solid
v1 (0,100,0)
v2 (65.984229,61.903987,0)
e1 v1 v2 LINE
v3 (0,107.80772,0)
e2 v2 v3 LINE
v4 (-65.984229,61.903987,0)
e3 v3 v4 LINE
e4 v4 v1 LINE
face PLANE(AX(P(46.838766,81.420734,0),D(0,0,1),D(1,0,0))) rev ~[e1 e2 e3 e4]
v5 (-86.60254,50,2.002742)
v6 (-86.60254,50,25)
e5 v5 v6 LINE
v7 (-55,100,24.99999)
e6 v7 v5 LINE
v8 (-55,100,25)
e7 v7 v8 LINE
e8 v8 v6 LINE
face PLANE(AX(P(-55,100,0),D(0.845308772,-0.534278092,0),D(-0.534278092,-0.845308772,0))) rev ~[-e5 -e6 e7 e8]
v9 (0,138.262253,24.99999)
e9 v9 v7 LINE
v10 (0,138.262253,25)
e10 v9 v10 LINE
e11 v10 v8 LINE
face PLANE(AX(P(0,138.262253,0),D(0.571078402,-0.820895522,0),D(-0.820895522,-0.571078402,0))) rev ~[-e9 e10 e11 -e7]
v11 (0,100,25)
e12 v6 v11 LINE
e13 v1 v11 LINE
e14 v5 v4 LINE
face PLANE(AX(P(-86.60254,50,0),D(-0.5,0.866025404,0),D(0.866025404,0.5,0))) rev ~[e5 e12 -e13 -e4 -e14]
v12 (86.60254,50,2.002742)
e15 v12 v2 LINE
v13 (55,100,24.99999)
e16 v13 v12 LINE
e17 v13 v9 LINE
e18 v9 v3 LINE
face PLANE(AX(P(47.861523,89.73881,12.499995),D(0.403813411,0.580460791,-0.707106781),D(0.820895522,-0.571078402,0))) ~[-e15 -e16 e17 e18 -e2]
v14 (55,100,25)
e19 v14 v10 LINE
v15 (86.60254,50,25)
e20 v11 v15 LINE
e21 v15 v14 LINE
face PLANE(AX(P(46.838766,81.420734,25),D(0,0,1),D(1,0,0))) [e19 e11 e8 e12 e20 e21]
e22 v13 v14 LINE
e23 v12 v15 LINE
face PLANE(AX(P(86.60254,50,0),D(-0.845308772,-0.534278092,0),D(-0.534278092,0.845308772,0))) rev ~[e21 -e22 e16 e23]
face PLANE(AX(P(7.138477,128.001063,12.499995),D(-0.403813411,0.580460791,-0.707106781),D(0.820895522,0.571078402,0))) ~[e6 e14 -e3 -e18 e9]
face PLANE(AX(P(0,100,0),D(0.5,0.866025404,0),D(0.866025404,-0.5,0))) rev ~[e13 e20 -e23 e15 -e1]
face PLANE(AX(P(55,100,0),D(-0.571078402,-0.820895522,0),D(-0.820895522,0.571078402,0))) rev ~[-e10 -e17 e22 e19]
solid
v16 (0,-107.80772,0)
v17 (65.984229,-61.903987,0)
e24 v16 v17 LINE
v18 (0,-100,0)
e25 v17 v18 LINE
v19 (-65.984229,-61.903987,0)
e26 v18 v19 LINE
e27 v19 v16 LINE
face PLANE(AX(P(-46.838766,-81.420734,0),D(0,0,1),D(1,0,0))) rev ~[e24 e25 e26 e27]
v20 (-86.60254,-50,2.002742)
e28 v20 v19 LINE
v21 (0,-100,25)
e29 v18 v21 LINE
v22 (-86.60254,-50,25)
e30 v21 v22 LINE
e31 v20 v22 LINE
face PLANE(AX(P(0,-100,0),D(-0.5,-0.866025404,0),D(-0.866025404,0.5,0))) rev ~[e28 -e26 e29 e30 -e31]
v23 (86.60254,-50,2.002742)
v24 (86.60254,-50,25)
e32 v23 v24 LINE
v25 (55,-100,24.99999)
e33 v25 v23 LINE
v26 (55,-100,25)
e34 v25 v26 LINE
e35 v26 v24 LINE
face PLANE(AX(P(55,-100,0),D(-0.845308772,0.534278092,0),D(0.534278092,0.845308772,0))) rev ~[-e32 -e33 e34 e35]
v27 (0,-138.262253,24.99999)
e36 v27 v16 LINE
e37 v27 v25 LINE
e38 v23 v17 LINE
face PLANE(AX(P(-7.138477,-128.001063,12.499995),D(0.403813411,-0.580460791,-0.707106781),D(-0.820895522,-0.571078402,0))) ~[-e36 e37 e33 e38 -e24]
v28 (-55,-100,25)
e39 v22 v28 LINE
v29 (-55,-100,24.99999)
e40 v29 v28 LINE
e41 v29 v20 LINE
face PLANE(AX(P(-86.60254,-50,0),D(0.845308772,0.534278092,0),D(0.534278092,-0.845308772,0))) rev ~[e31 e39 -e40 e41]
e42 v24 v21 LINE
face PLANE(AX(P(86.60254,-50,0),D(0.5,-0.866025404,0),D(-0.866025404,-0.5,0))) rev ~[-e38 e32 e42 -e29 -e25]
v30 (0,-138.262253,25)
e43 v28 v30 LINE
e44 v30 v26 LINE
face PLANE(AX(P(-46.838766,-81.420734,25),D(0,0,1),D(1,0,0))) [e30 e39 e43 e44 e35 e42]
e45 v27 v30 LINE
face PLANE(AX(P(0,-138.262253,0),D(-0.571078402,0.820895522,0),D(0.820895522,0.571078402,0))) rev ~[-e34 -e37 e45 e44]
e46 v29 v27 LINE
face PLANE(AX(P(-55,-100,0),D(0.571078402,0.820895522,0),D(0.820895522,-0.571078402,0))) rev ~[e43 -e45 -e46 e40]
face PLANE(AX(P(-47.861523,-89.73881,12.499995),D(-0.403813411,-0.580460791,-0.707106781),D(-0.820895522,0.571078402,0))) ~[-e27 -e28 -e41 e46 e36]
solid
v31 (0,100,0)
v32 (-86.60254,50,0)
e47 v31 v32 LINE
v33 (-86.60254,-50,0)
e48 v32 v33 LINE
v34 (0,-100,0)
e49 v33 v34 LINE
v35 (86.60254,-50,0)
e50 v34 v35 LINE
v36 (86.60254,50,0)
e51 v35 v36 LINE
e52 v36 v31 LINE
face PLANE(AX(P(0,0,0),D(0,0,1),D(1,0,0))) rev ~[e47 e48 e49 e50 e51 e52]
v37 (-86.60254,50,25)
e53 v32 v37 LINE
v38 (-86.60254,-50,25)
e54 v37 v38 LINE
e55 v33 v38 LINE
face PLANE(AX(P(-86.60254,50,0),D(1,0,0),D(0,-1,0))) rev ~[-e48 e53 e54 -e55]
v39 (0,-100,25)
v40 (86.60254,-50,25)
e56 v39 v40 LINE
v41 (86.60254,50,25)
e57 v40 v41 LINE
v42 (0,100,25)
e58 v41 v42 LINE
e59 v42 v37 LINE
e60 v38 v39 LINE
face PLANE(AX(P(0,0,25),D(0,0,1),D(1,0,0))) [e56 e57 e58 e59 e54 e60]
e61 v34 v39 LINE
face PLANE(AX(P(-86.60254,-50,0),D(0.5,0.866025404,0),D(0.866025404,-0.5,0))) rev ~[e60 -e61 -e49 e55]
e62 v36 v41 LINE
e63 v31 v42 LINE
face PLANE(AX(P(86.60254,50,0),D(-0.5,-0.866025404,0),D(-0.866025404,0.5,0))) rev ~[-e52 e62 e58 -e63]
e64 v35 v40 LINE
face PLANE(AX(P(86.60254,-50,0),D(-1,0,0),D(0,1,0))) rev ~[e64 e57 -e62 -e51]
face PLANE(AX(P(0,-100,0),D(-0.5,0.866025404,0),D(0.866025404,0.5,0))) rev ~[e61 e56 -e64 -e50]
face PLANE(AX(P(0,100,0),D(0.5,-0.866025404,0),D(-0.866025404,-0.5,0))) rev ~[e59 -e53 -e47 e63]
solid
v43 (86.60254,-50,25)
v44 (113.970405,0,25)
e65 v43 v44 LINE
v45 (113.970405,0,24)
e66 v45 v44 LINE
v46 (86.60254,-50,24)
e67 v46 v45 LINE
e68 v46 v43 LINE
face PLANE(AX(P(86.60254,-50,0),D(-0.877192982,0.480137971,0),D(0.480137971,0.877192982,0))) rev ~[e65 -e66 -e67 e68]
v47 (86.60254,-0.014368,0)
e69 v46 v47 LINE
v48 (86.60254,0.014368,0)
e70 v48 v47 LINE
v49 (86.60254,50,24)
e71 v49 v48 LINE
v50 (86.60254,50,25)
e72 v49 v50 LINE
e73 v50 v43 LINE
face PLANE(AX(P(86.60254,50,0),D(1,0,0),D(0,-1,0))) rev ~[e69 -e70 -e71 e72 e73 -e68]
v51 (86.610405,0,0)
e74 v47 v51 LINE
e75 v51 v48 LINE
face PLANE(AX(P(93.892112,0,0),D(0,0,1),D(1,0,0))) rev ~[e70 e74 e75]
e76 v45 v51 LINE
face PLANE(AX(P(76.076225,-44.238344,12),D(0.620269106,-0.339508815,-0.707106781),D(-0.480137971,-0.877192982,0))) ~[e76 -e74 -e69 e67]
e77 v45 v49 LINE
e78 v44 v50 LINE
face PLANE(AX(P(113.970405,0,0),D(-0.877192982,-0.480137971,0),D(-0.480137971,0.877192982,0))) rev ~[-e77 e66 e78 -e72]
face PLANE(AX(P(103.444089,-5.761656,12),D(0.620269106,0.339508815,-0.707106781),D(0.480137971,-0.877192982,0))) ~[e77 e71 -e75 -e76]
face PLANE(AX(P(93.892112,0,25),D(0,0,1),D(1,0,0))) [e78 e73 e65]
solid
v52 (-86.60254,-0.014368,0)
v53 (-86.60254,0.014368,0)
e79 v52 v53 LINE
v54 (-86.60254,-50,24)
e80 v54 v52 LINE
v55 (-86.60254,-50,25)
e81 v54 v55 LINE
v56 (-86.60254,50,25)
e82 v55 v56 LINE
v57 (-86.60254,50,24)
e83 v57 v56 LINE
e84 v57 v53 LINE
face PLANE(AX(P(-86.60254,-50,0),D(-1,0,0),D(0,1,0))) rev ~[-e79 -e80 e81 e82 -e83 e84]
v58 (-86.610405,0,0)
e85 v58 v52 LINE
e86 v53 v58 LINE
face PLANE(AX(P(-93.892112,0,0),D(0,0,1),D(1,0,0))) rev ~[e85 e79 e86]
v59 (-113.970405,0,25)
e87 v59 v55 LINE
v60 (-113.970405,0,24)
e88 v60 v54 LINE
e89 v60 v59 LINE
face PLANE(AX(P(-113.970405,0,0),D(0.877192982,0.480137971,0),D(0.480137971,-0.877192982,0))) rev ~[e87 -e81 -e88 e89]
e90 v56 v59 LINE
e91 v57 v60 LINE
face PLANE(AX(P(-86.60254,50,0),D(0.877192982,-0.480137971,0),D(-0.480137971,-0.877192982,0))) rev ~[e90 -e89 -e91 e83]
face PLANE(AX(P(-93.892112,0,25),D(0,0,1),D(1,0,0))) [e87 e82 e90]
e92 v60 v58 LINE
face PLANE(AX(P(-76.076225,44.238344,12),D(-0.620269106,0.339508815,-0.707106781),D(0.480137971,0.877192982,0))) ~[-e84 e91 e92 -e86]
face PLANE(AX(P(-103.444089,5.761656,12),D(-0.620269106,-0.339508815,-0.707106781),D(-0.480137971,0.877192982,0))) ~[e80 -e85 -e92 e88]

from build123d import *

# Parameters (mm, degrees)
F2_DEPTH  = 25
F3_SIZE   = 24.99999
F3_2_SIZE = 24.99999
F4_SIZE   = 24
F4_2_SIZE = 24


# Not quite as in the source:
# - a fillet or chamfer is up to 0.001 mm smaller than in the source, because OpenCascade refuses the exact size
# - a feature names something its author has since deleted; it is built from what else it names


with BuildPart() as f2:
    # F1 (on face) → F2 (new body)
    with BuildSketch(Plane.XY):
        Polygon((-86.6025403784, -50), (0, -100), (86.6025403784, -50), (86.6025403784, 50), (0, 100), (-86.6025403784, 50), align=None)
    extrude(amount=F2_DEPTH)


with BuildPart() as f2b:
    # F0 (on Top) → F2, piece 2 (new body)
    with BuildSketch(Plane.XY):
        Polygon((0, 100), (86.6025403784, 50), (55, 100), align=None)
        Polygon((-86.6025403784, 50), (0, 100), (-55, 100), align=None)
        Polygon((-55, 100), (0, 100), (55, 100), (0, 138.2622529394), align=None)
    extrude(amount=F2_DEPTH)

    # F3 (size 25 in the source; OpenCascade refuses exactly that, so slightly less here)
    f3_edges = [f2b.edges().sort_by_distance(p)[0] for p in [
        (-27.5, 119.131126, 0),
        (27.5, 119.131126, 0),
    ]]
    chamfer(f3_edges, length=F3_SIZE)


with BuildPart() as f2c:
    # F0 (on Top) → F2, piece 3 (new body)
    with BuildSketch(Plane.XY):
        Polygon((-113.9704047453, 0), (-86.6025403784, -50), (-86.6025403784, 50), align=None)
    extrude(amount=F2_DEPTH)

    # F4
    f4_edges = [f2c.edges().sort_by_distance(p)[0] for p in [
        (-100.286473, 25, 0),
        (-100.286473, -25, 0),
    ]]
    chamfer(f4_edges, length=F4_SIZE)


with BuildPart() as f2d:
    # F0 (on Top) → F2, piece 4 (new body)
    with BuildSketch(Plane.XY):
        Polygon((-55, -100), (0, -100), (-86.6025403784, -50), align=None)
        Polygon((55, -100), (86.6025403784, -50), (0, -100), align=None)
        Polygon((55, -100), (0, -100), (-55, -100), (0, -138.2622529394), align=None)
    extrude(amount=F2_DEPTH)

    # F3#2 (size 25 in the source; OpenCascade refuses exactly that, so slightly less here)
    f3_2_edges = [f2d.edges().sort_by_distance(p)[0] for p in [
        (-27.5, -119.131126, 0),
        (27.5, -119.131126, 0),
    ]]
    chamfer(f3_2_edges, length=F3_2_SIZE)


with BuildPart() as f2e:
    # F0 (on Top) → F2, piece 5 (new body)
    with BuildSketch(Plane.XY):
        Polygon((86.6025403784, 50), (86.6025403784, -50), (113.9704047453, 0), align=None)
    extrude(amount=F2_DEPTH)

    # F4#2
    f4_2_edges = [f2e.edges().sort_by_distance(p)[0] for p in [
        (100.286473, -25, 0),
        (100.286473, 25, 0),
    ]]
    chamfer(f4_2_edges, length=F4_2_SIZE)


solid = Compound([f2.part, f2b.part, f2c.part, f2d.part, f2e.part])
